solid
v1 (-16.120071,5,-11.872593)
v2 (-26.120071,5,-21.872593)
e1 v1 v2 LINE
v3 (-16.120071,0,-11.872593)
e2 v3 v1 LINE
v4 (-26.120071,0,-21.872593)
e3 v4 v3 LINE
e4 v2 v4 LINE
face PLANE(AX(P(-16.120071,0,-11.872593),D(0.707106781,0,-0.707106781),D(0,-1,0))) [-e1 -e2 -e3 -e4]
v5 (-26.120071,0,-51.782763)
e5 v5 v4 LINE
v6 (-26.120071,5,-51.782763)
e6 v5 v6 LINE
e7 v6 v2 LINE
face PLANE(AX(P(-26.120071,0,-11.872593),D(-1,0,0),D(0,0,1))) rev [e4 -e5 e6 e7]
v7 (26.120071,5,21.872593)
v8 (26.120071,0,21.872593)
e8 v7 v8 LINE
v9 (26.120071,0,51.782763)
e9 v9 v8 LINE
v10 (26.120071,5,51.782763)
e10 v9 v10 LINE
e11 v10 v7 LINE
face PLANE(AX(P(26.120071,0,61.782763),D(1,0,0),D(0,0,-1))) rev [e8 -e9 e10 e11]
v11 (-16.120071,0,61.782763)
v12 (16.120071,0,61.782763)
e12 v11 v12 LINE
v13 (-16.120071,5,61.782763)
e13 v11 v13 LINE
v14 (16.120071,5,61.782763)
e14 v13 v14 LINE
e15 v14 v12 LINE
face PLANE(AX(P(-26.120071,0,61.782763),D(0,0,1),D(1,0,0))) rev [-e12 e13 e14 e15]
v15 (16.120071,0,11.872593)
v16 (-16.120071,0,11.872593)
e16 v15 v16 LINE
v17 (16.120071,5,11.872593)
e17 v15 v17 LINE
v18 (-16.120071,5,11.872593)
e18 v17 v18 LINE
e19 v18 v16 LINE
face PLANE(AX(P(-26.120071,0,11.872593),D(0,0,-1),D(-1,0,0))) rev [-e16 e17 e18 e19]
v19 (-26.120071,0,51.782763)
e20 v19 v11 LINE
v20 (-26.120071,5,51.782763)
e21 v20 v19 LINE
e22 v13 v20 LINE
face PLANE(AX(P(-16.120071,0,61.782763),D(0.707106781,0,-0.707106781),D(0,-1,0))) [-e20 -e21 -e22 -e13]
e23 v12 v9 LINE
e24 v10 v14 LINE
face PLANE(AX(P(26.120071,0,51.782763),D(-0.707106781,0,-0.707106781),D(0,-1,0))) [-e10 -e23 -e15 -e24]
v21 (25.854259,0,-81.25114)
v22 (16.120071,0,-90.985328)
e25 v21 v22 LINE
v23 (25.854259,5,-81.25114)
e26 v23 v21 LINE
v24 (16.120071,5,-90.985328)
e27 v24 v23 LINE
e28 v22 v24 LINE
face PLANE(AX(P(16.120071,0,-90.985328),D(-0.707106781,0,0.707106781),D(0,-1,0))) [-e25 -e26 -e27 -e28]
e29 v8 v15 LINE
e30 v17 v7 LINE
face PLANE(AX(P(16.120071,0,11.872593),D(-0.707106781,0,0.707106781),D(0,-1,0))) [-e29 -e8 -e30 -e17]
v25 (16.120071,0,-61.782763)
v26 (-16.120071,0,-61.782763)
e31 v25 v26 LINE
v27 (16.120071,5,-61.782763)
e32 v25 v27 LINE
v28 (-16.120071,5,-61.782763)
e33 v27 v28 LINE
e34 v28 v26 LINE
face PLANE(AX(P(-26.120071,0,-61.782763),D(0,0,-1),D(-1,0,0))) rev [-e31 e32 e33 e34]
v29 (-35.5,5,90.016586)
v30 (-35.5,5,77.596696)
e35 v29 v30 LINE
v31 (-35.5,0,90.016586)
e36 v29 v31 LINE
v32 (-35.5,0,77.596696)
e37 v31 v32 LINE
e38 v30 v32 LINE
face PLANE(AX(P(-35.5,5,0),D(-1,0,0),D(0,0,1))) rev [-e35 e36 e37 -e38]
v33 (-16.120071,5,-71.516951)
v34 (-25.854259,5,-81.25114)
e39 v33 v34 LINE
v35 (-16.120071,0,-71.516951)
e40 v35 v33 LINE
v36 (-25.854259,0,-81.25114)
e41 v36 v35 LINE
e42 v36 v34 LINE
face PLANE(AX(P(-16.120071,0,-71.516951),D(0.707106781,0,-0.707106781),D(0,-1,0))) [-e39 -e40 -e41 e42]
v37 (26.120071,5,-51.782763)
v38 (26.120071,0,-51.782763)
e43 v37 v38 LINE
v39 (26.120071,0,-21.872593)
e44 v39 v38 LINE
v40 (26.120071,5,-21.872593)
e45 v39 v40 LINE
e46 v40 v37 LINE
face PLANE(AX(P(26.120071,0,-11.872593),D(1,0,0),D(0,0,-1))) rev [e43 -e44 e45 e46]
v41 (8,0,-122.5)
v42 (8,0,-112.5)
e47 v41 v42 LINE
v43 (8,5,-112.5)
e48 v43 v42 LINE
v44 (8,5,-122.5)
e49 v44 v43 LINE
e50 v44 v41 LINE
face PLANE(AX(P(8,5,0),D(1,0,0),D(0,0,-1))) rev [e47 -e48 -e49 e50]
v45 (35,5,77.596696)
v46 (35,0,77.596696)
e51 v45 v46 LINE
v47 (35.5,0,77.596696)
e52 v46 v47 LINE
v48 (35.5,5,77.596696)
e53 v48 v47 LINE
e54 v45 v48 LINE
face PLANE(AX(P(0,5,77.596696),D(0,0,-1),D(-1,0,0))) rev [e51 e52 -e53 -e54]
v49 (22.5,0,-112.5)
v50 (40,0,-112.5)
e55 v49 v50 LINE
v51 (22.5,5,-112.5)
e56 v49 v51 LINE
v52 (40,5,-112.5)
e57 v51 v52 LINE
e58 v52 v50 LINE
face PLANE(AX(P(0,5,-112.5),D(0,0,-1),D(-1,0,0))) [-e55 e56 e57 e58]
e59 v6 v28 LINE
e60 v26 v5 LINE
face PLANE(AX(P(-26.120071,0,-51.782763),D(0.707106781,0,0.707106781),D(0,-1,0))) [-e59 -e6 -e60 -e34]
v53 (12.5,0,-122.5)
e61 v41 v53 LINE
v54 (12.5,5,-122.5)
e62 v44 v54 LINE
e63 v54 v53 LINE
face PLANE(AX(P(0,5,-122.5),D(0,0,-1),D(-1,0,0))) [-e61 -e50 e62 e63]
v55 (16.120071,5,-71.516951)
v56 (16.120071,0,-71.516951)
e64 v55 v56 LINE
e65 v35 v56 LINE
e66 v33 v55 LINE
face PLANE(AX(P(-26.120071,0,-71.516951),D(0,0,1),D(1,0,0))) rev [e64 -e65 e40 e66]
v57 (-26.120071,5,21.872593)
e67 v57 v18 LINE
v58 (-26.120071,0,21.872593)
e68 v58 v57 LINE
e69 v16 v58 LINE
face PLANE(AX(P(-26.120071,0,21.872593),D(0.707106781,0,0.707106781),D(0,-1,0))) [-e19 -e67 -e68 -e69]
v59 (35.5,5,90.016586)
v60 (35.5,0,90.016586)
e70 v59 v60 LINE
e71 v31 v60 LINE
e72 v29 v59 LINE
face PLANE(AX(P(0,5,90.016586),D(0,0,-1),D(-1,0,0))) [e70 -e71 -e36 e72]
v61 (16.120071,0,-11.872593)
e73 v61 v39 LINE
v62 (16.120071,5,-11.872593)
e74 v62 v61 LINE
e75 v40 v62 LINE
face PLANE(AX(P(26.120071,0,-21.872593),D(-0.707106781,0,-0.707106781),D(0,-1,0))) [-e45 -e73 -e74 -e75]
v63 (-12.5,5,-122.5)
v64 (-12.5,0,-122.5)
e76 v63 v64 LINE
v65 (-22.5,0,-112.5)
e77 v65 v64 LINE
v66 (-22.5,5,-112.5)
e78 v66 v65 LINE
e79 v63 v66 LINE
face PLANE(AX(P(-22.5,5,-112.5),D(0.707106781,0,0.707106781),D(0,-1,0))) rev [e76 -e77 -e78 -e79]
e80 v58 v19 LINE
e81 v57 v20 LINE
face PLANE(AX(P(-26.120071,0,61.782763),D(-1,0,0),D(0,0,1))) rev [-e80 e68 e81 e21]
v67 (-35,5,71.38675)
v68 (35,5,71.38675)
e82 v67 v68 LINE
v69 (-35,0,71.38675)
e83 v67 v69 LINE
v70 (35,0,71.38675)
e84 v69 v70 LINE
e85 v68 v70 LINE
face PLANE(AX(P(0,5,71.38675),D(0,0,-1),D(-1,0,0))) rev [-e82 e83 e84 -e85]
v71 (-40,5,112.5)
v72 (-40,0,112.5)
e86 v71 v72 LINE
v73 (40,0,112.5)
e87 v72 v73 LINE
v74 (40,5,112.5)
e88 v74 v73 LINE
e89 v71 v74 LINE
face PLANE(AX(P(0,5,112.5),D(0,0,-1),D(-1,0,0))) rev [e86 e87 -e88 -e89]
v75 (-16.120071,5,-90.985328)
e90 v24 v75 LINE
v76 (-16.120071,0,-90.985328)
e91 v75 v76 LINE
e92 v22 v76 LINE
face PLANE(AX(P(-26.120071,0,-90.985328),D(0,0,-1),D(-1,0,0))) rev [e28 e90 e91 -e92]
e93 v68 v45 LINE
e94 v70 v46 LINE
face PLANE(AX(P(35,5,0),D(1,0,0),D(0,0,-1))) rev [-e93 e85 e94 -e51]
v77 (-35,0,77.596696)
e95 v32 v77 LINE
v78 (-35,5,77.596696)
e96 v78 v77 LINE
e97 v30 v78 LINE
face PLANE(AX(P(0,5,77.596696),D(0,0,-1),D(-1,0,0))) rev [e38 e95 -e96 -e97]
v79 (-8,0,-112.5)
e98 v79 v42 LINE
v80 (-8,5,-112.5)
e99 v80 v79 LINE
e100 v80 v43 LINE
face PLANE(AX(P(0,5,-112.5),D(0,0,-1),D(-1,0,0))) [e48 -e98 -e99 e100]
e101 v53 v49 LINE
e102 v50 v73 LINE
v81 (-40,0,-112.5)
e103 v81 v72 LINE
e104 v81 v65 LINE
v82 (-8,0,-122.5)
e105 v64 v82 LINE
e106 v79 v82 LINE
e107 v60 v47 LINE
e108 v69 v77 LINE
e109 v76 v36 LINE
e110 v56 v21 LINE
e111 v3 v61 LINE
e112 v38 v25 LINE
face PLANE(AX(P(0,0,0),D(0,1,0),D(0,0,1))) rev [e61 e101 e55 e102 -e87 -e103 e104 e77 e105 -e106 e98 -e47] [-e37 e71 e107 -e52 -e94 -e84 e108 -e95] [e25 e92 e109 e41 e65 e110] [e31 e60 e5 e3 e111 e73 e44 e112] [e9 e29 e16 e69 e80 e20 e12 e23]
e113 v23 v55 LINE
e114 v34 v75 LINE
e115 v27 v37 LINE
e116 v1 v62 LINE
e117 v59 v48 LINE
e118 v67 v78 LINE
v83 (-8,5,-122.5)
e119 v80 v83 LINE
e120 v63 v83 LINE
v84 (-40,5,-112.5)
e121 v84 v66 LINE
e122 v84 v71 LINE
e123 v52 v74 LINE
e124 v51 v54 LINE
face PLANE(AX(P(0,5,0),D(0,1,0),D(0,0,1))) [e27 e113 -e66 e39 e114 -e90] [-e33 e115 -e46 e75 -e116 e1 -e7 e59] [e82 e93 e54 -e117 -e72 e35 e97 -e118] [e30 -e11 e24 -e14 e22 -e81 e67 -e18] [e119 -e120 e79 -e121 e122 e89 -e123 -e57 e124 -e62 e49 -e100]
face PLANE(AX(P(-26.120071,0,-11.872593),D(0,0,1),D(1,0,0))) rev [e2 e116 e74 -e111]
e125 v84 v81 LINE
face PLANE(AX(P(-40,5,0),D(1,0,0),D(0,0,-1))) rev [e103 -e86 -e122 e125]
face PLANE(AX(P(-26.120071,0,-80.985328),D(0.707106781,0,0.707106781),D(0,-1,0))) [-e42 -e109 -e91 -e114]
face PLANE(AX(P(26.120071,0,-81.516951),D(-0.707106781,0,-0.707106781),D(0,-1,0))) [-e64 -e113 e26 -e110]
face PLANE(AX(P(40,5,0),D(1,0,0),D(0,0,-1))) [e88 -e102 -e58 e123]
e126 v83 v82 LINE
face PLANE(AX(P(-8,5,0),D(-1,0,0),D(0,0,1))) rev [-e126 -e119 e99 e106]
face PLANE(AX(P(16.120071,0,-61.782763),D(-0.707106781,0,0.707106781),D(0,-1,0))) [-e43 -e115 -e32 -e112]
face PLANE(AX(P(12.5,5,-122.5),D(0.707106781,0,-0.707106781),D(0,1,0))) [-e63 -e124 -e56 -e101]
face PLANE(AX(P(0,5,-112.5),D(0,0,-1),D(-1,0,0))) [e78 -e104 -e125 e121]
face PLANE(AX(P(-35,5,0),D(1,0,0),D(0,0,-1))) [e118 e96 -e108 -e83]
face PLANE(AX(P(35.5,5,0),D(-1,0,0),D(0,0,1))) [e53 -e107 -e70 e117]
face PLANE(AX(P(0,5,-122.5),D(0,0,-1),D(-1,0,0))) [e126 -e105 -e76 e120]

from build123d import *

# Parameters (mm, degrees)
BOSS_EXTRUDE1_DEPTH = 5
CHAMFER1_SIZE       = 10
SKETCH2_W           = 52.240142394
SKETCH2_H           = 49.910170897
SKETCH2_H_2         = 19.468376047
CUT_EXTRUDE1_DEPTH  = 5
CHAMFER2_SIZE       = 10


# Some blends are built 0.0001 mm under size
with BuildPart() as part:
    # Sketch1 → Boss-Extrude1 (new body)
    with BuildSketch(Plane(origin=(0, 0, 0), x_dir=(1, 0, 0), z_dir=(0, 1, 0))):
        Polygon((12.5, 112.5), (40, 112.5), (40, -112.5), (-40, -112.5), (-40, 112.5), (-12.5, 112.5), (-12.5, 122.5), (-8, 122.5), (-8, 112.5), (8, 112.5), (8, 122.5), (12.5, 122.5), align=None)
        Polygon((35, -71.386750493), (35, -77.596695784), (35.5, -77.596695784), (35.5, -90.016586366), (-35.5, -90.016586366), (-35.5, -77.596695784), (-35, -77.596695784), (-35, -71.386750493), align=None, mode=Mode.SUBTRACT)
    extrude(amount=BOSS_EXTRUDE1_DEPTH)

    # Chamfer1
    chamfer1_edges = [part.edges().sort_by_distance(p)[0] for p in [
        (-12.5, 2.5, -112.5),
        (12.5, 2.5, -112.5),
    ]]
    chamfer(chamfer1_edges, length=CHAMFER1_SIZE - 0.0001)  # a hair under: the kernel refuses the full size

    # Sketch2 → Cut-Extrude1 (cut)
    with BuildSketch(Plane(origin=(0, 5, 0), x_dir=(1, 0, 0), z_dir=(0, 1, 0))):
        with Locations((0, 36.827678023)):
            Rectangle(SKETCH2_W, SKETCH2_H)
        with Locations((0, -36.827678023)):
            Rectangle(SKETCH2_W, SKETCH2_H)
        with Locations((0, 81.251139518)):
            Rectangle(SKETCH2_W, SKETCH2_H_2)
    extrude(amount=-CUT_EXTRUDE1_DEPTH, mode=Mode.SUBTRACT)

    # Chamfer2
    # the kernel refuses this chamfer: 10 mm, written as the material it adds along each edge
    with BuildSketch(Plane(origin=(26.120071197, 5, -90.985327541), x_dir=(-0.9996219169112968, 0, -0.027495876610586317), z_dir=(0, -1, 0)), Plane(origin=(26.120071197, 5, -71.516951494), x_dir=(0.027495876610586317, 0, -0.9996219169112968), z_dir=(0, -1, 0)), Plane(origin=(-26.120071197, 5, -71.516951494), x_dir=(0.9996219169112968, 0, 0.027495876610586317), z_dir=(0, -1, 0)), Plane(origin=(-26.120071197, 5, 11.872592574), x_dir=(-0.027495876610586667, 0, 0.9996219169112968), z_dir=(0, -1, 0)), Plane(origin=(26.120071197, 5, 11.872592574), x_dir=(-0.9996219169112968, 0, -0.027495876610586317), z_dir=(0, -1, 0)), Plane(origin=(26.120071197, 5, 61.782763471), x_dir=(0.027495876610586317, 0, -0.9996219169112968), z_dir=(0, -1, 0)), Plane(origin=(26.120071197, 5, -61.782763471), x_dir=(-0.9996219169112968, 0, -0.027495876610586317), z_dir=(0, -1, 0)), Plane(origin=(26.120071197, 5, -11.872592574), x_dir=(0.027495876610586324, 0, -0.9996219169112968), z_dir=(0, -1, 0)), Plane(origin=(-26.120071197, 5, -61.782763471), x_dir=(-0.027495876610585973, 0, 0.9996219169112968), z_dir=(0, -1, 0))) as chamfer2_piece_1:
        Polygon((CHAMFER2_SIZE * 0.999621916911, -CHAMFER2_SIZE * 0.0274958766106), (-CHAMFER2_SIZE * 0.0274958766106, -CHAMFER2_SIZE * 0.999621916911), (0, 0), align=None)
    extrude(amount=5)
    with BuildSketch(Plane(origin=(-26.120071197, 5, -90.985327541), x_dir=(0.9996219169112968, 0, -0.027495876610586317), z_dir=(0, -1, 0)), Plane(origin=(-26.120071197, 5, 61.782763471), x_dir=(-0.027495876610585973, 0, -0.9996219169112968), z_dir=(0, -1, 0)), Plane(origin=(-26.120071197, 5, -11.872592574), x_dir=(-0.027495876610586667, 0, -0.9996219169112968), z_dir=(0, -1, 0))) as chamfer2_piece_2:
        Polygon((CHAMFER2_SIZE * 0.999621916911, CHAMFER2_SIZE * 0.0274958766106), (-CHAMFER2_SIZE * 0.0274958766106, CHAMFER2_SIZE * 0.999621916911), (0, 0), align=None)
    extrude(amount=5)


solid = part.part
